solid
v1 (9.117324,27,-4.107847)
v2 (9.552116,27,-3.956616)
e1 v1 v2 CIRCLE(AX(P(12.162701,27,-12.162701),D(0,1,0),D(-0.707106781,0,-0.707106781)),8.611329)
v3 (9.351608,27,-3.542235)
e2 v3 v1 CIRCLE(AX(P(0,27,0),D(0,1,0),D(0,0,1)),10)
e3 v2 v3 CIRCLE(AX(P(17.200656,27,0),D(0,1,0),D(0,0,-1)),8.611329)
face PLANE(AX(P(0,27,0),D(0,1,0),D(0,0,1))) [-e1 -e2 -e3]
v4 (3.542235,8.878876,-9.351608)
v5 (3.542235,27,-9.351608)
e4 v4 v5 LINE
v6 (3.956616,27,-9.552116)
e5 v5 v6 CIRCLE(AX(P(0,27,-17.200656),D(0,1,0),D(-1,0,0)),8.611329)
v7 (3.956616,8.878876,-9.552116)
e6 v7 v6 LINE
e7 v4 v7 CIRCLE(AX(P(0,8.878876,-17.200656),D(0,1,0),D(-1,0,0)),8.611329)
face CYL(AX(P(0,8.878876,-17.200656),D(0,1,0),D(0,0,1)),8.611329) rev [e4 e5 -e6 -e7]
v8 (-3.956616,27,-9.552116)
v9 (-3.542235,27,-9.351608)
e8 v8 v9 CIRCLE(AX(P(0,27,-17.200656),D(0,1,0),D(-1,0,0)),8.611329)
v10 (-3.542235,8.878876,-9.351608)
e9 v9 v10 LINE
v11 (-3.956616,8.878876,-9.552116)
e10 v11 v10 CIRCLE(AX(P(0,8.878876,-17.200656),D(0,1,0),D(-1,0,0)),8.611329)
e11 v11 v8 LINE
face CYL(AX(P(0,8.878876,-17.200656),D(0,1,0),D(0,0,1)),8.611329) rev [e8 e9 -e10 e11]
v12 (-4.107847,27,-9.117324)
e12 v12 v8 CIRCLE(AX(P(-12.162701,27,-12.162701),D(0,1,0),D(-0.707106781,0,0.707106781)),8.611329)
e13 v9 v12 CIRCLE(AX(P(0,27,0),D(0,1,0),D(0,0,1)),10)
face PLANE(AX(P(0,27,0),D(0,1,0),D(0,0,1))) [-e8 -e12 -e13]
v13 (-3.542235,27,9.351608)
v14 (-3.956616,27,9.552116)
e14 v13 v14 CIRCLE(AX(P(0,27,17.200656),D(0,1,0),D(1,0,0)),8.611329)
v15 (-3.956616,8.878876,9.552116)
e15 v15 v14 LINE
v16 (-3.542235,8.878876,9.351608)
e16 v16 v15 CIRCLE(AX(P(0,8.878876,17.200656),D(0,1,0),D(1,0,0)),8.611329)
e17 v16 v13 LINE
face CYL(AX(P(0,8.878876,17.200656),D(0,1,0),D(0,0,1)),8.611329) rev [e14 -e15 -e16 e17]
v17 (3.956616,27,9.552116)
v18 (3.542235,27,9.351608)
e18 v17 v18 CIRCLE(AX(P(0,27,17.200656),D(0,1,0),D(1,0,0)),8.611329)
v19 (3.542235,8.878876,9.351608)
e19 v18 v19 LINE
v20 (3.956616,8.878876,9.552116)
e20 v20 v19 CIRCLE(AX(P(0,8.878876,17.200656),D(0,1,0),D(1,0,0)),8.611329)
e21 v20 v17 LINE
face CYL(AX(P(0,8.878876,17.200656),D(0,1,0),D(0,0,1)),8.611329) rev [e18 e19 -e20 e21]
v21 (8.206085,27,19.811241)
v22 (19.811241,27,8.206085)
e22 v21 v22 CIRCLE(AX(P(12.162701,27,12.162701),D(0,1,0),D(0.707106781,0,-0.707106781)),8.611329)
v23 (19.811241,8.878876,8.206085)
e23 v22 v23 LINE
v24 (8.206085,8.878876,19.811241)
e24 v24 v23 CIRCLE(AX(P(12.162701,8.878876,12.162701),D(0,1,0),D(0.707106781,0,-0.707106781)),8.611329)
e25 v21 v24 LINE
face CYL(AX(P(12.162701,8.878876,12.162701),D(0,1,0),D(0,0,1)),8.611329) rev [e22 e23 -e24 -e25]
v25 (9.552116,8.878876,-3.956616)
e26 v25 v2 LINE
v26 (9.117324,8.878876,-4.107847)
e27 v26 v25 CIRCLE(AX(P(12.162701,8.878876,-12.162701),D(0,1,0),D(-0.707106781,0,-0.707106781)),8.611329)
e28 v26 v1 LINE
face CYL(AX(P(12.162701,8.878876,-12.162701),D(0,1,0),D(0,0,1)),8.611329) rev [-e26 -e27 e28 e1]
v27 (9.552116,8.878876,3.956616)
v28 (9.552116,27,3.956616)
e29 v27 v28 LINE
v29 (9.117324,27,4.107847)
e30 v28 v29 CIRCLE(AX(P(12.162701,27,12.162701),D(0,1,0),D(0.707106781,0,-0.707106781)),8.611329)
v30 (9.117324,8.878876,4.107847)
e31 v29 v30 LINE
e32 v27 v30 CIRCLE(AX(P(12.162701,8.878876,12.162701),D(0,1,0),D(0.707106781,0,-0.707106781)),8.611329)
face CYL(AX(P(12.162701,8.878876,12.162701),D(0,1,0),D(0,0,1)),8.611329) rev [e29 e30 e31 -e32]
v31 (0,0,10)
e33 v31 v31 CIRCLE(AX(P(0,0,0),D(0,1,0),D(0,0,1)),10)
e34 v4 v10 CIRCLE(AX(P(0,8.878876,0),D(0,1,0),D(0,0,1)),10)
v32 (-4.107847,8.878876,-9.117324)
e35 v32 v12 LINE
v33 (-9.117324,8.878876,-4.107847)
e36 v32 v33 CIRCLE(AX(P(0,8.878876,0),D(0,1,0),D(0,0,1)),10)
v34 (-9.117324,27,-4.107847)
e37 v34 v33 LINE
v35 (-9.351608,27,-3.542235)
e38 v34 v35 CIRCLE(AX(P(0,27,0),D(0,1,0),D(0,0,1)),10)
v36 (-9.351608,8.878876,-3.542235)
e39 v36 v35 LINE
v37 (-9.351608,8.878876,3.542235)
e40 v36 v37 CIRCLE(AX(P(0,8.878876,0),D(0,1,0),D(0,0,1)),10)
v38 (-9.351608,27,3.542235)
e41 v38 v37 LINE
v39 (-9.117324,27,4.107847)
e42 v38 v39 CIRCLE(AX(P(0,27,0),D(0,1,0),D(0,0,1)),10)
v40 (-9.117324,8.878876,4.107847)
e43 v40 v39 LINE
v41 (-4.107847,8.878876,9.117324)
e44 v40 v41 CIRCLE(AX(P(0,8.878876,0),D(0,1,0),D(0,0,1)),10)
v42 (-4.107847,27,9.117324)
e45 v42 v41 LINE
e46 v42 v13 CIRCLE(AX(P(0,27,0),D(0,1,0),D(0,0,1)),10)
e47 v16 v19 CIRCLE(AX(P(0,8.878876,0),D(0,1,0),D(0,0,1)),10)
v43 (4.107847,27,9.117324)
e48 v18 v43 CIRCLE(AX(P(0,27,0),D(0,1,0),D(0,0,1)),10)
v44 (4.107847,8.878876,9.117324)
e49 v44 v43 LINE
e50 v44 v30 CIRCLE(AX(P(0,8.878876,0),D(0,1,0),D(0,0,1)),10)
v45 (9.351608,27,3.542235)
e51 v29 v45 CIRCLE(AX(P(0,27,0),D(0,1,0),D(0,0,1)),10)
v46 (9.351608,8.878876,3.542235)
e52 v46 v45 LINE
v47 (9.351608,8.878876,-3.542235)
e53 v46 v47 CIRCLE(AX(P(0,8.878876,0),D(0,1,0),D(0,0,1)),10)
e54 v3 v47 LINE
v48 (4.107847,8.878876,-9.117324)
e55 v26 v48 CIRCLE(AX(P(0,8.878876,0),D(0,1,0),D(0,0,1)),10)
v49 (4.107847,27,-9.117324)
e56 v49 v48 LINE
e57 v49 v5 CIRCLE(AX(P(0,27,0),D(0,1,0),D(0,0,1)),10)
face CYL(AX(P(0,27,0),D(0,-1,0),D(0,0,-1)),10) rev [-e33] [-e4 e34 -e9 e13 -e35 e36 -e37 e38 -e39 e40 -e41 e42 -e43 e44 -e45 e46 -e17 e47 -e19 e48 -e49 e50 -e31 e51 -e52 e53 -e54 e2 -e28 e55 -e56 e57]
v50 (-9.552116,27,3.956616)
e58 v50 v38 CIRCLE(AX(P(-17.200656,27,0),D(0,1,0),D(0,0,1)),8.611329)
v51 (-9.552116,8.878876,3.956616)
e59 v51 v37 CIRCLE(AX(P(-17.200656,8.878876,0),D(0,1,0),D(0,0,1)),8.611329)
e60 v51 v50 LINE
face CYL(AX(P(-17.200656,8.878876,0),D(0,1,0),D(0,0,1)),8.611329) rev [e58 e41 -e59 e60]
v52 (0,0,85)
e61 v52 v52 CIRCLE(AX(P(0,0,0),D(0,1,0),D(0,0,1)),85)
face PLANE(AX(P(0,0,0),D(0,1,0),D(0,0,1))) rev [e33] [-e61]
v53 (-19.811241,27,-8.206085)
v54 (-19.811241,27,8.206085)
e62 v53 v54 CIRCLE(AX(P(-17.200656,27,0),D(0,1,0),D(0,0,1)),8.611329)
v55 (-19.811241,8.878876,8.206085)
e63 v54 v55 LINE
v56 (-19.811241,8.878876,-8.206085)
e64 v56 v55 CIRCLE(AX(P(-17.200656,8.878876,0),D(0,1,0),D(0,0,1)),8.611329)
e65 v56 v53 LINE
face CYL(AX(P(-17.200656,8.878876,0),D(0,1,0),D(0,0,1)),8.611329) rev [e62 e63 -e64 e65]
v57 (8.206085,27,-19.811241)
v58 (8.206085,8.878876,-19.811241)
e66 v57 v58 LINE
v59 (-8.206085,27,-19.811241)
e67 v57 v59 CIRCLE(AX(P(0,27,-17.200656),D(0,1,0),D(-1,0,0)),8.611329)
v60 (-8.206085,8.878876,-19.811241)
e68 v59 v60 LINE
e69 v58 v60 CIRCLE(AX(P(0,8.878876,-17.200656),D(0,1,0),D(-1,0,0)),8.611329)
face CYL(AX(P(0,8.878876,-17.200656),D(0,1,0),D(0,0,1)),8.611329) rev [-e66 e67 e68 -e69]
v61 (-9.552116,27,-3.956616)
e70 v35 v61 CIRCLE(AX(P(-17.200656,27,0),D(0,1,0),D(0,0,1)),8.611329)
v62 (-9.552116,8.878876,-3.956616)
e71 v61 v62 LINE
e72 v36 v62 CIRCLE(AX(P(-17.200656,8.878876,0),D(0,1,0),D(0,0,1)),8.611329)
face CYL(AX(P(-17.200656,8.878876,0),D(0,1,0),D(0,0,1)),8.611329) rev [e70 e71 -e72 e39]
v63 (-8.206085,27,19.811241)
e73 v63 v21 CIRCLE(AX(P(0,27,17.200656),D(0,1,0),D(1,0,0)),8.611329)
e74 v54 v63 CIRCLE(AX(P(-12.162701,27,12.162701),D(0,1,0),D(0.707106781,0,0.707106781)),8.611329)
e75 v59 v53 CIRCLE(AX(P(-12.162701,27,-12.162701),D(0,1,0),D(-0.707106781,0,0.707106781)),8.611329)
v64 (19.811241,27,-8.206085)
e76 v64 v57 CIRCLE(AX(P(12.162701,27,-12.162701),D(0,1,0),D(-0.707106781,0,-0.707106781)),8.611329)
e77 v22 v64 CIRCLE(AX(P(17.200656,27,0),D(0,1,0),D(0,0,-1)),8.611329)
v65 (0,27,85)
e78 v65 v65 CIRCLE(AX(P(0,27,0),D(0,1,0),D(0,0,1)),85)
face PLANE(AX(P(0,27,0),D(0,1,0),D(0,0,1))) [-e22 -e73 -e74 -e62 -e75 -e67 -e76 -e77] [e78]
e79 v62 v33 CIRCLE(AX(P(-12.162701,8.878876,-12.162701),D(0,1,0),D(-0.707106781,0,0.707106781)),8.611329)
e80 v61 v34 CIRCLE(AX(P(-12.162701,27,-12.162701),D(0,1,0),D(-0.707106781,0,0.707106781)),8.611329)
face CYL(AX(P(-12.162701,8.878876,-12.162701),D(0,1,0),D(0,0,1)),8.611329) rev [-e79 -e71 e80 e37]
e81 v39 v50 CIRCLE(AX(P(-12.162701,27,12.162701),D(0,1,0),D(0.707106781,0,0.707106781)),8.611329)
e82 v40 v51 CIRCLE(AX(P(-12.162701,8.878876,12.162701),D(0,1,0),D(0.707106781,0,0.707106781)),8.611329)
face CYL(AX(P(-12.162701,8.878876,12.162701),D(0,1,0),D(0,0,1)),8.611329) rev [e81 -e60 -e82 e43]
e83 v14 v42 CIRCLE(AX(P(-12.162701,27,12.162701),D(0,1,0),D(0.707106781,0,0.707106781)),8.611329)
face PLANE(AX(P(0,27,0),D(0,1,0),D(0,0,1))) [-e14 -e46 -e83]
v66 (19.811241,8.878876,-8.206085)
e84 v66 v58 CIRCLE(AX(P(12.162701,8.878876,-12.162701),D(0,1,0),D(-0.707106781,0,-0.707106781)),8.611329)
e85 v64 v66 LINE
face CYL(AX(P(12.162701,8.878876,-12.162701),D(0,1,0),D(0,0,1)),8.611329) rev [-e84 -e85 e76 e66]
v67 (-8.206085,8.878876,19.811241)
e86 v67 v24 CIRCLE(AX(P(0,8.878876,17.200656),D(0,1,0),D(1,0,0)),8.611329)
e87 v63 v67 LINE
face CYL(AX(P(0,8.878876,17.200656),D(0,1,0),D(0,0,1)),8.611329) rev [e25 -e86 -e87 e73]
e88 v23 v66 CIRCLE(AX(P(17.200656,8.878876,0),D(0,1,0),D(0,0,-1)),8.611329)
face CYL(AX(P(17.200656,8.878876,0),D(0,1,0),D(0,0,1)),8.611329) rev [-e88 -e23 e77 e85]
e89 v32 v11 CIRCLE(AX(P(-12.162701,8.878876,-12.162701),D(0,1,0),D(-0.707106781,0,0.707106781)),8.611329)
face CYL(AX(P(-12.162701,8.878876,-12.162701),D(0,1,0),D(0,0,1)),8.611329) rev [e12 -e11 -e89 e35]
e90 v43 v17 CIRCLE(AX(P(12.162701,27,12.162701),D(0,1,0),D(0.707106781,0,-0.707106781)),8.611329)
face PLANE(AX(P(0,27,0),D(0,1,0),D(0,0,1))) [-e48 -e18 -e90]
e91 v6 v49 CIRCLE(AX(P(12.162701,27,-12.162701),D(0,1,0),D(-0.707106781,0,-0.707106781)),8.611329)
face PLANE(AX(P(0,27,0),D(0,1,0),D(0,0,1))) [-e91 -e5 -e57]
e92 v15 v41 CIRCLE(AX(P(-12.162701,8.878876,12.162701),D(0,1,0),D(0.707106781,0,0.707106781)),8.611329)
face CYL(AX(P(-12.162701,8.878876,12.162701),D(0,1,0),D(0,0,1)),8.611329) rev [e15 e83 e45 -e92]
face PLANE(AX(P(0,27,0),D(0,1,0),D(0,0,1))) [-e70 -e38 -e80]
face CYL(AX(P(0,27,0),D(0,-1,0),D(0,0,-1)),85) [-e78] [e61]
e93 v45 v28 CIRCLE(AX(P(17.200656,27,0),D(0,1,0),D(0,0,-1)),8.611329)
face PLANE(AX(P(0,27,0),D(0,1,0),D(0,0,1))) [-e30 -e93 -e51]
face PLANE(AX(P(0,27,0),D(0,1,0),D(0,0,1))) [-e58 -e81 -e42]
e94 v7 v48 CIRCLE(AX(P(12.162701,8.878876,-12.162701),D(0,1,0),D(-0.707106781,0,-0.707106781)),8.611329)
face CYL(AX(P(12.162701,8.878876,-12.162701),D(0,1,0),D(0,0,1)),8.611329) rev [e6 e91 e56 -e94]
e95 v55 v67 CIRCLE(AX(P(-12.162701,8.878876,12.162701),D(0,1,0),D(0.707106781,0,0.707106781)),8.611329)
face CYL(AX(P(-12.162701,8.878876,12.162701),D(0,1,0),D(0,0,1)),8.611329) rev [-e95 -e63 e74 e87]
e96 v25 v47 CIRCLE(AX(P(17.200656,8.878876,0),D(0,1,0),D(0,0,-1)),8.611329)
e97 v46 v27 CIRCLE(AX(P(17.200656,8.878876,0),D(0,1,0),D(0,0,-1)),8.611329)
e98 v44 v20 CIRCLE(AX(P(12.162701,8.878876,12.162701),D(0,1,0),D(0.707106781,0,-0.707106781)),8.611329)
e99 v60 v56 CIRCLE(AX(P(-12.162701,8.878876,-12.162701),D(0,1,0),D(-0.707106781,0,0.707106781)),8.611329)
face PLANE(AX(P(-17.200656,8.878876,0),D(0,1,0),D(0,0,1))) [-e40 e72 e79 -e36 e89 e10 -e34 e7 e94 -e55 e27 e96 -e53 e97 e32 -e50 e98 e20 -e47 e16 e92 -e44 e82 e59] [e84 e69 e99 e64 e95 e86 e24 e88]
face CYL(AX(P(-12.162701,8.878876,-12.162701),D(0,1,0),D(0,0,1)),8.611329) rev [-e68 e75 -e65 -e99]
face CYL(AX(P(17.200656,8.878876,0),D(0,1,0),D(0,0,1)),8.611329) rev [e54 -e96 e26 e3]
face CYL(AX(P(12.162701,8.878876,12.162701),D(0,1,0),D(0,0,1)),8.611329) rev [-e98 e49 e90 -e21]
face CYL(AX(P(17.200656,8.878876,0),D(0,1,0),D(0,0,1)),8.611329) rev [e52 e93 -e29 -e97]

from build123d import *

# Parameters (mm, degrees)
SKETCH1_R           = 85
BOSS_EXTRUDE1_DEPTH = 27
SKETCH2_R           = 10
CUT_EXTRUDE1_DEPTH  = 124.203084377
SKETCH3_R           = 8.611328572
CUT_EXTRUDE2_DEPTH  = 18.121123797
CIRPATTERN1_COUNT   = 8


with BuildPart() as part:
    # Sketch1 → Boss-Extrude1 (new body)
    with BuildSketch(Plane(origin=(0, 0, 0), x_dir=(1, 0, 0), z_dir=(0, 1, 0))):
        Circle(SKETCH1_R)
    extrude(amount=BOSS_EXTRUDE1_DEPTH)

    # Sketch2 → Cut-Extrude1 (cut, through all)
    with BuildSketch(Plane(origin=(0, 0, 0), x_dir=(1, 0, 0), z_dir=(0, 1, 0))):
        Circle(SKETCH2_R)
    extrude(amount=CUT_EXTRUDE1_DEPTH, mode=Mode.SUBTRACT)

    # Sketch3 → Cut-Extrude2 (cut)
    with BuildSketch(Plane(origin=(0, 27, 0), x_dir=(1, 0, 0), z_dir=(0, 1, 0))):
        with Locations((-17.200656016, 0)):
            Circle(SKETCH3_R)
    cut_extrude2 = extrude(amount=-CUT_EXTRUDE2_DEPTH, mode=Mode.SUBTRACT)

    # CirPattern1: Cut-Extrude2 ×8 about axis
    cirpattern1_axis = Axis((0, 0, 0), (0, 1, 0))
    for i in range(1, CIRPATTERN1_COUNT):
        add(cut_extrude2.rotate(cirpattern1_axis, i * 360 / CIRPATTERN1_COUNT), mode=Mode.SUBTRACT)


solid = part.part
